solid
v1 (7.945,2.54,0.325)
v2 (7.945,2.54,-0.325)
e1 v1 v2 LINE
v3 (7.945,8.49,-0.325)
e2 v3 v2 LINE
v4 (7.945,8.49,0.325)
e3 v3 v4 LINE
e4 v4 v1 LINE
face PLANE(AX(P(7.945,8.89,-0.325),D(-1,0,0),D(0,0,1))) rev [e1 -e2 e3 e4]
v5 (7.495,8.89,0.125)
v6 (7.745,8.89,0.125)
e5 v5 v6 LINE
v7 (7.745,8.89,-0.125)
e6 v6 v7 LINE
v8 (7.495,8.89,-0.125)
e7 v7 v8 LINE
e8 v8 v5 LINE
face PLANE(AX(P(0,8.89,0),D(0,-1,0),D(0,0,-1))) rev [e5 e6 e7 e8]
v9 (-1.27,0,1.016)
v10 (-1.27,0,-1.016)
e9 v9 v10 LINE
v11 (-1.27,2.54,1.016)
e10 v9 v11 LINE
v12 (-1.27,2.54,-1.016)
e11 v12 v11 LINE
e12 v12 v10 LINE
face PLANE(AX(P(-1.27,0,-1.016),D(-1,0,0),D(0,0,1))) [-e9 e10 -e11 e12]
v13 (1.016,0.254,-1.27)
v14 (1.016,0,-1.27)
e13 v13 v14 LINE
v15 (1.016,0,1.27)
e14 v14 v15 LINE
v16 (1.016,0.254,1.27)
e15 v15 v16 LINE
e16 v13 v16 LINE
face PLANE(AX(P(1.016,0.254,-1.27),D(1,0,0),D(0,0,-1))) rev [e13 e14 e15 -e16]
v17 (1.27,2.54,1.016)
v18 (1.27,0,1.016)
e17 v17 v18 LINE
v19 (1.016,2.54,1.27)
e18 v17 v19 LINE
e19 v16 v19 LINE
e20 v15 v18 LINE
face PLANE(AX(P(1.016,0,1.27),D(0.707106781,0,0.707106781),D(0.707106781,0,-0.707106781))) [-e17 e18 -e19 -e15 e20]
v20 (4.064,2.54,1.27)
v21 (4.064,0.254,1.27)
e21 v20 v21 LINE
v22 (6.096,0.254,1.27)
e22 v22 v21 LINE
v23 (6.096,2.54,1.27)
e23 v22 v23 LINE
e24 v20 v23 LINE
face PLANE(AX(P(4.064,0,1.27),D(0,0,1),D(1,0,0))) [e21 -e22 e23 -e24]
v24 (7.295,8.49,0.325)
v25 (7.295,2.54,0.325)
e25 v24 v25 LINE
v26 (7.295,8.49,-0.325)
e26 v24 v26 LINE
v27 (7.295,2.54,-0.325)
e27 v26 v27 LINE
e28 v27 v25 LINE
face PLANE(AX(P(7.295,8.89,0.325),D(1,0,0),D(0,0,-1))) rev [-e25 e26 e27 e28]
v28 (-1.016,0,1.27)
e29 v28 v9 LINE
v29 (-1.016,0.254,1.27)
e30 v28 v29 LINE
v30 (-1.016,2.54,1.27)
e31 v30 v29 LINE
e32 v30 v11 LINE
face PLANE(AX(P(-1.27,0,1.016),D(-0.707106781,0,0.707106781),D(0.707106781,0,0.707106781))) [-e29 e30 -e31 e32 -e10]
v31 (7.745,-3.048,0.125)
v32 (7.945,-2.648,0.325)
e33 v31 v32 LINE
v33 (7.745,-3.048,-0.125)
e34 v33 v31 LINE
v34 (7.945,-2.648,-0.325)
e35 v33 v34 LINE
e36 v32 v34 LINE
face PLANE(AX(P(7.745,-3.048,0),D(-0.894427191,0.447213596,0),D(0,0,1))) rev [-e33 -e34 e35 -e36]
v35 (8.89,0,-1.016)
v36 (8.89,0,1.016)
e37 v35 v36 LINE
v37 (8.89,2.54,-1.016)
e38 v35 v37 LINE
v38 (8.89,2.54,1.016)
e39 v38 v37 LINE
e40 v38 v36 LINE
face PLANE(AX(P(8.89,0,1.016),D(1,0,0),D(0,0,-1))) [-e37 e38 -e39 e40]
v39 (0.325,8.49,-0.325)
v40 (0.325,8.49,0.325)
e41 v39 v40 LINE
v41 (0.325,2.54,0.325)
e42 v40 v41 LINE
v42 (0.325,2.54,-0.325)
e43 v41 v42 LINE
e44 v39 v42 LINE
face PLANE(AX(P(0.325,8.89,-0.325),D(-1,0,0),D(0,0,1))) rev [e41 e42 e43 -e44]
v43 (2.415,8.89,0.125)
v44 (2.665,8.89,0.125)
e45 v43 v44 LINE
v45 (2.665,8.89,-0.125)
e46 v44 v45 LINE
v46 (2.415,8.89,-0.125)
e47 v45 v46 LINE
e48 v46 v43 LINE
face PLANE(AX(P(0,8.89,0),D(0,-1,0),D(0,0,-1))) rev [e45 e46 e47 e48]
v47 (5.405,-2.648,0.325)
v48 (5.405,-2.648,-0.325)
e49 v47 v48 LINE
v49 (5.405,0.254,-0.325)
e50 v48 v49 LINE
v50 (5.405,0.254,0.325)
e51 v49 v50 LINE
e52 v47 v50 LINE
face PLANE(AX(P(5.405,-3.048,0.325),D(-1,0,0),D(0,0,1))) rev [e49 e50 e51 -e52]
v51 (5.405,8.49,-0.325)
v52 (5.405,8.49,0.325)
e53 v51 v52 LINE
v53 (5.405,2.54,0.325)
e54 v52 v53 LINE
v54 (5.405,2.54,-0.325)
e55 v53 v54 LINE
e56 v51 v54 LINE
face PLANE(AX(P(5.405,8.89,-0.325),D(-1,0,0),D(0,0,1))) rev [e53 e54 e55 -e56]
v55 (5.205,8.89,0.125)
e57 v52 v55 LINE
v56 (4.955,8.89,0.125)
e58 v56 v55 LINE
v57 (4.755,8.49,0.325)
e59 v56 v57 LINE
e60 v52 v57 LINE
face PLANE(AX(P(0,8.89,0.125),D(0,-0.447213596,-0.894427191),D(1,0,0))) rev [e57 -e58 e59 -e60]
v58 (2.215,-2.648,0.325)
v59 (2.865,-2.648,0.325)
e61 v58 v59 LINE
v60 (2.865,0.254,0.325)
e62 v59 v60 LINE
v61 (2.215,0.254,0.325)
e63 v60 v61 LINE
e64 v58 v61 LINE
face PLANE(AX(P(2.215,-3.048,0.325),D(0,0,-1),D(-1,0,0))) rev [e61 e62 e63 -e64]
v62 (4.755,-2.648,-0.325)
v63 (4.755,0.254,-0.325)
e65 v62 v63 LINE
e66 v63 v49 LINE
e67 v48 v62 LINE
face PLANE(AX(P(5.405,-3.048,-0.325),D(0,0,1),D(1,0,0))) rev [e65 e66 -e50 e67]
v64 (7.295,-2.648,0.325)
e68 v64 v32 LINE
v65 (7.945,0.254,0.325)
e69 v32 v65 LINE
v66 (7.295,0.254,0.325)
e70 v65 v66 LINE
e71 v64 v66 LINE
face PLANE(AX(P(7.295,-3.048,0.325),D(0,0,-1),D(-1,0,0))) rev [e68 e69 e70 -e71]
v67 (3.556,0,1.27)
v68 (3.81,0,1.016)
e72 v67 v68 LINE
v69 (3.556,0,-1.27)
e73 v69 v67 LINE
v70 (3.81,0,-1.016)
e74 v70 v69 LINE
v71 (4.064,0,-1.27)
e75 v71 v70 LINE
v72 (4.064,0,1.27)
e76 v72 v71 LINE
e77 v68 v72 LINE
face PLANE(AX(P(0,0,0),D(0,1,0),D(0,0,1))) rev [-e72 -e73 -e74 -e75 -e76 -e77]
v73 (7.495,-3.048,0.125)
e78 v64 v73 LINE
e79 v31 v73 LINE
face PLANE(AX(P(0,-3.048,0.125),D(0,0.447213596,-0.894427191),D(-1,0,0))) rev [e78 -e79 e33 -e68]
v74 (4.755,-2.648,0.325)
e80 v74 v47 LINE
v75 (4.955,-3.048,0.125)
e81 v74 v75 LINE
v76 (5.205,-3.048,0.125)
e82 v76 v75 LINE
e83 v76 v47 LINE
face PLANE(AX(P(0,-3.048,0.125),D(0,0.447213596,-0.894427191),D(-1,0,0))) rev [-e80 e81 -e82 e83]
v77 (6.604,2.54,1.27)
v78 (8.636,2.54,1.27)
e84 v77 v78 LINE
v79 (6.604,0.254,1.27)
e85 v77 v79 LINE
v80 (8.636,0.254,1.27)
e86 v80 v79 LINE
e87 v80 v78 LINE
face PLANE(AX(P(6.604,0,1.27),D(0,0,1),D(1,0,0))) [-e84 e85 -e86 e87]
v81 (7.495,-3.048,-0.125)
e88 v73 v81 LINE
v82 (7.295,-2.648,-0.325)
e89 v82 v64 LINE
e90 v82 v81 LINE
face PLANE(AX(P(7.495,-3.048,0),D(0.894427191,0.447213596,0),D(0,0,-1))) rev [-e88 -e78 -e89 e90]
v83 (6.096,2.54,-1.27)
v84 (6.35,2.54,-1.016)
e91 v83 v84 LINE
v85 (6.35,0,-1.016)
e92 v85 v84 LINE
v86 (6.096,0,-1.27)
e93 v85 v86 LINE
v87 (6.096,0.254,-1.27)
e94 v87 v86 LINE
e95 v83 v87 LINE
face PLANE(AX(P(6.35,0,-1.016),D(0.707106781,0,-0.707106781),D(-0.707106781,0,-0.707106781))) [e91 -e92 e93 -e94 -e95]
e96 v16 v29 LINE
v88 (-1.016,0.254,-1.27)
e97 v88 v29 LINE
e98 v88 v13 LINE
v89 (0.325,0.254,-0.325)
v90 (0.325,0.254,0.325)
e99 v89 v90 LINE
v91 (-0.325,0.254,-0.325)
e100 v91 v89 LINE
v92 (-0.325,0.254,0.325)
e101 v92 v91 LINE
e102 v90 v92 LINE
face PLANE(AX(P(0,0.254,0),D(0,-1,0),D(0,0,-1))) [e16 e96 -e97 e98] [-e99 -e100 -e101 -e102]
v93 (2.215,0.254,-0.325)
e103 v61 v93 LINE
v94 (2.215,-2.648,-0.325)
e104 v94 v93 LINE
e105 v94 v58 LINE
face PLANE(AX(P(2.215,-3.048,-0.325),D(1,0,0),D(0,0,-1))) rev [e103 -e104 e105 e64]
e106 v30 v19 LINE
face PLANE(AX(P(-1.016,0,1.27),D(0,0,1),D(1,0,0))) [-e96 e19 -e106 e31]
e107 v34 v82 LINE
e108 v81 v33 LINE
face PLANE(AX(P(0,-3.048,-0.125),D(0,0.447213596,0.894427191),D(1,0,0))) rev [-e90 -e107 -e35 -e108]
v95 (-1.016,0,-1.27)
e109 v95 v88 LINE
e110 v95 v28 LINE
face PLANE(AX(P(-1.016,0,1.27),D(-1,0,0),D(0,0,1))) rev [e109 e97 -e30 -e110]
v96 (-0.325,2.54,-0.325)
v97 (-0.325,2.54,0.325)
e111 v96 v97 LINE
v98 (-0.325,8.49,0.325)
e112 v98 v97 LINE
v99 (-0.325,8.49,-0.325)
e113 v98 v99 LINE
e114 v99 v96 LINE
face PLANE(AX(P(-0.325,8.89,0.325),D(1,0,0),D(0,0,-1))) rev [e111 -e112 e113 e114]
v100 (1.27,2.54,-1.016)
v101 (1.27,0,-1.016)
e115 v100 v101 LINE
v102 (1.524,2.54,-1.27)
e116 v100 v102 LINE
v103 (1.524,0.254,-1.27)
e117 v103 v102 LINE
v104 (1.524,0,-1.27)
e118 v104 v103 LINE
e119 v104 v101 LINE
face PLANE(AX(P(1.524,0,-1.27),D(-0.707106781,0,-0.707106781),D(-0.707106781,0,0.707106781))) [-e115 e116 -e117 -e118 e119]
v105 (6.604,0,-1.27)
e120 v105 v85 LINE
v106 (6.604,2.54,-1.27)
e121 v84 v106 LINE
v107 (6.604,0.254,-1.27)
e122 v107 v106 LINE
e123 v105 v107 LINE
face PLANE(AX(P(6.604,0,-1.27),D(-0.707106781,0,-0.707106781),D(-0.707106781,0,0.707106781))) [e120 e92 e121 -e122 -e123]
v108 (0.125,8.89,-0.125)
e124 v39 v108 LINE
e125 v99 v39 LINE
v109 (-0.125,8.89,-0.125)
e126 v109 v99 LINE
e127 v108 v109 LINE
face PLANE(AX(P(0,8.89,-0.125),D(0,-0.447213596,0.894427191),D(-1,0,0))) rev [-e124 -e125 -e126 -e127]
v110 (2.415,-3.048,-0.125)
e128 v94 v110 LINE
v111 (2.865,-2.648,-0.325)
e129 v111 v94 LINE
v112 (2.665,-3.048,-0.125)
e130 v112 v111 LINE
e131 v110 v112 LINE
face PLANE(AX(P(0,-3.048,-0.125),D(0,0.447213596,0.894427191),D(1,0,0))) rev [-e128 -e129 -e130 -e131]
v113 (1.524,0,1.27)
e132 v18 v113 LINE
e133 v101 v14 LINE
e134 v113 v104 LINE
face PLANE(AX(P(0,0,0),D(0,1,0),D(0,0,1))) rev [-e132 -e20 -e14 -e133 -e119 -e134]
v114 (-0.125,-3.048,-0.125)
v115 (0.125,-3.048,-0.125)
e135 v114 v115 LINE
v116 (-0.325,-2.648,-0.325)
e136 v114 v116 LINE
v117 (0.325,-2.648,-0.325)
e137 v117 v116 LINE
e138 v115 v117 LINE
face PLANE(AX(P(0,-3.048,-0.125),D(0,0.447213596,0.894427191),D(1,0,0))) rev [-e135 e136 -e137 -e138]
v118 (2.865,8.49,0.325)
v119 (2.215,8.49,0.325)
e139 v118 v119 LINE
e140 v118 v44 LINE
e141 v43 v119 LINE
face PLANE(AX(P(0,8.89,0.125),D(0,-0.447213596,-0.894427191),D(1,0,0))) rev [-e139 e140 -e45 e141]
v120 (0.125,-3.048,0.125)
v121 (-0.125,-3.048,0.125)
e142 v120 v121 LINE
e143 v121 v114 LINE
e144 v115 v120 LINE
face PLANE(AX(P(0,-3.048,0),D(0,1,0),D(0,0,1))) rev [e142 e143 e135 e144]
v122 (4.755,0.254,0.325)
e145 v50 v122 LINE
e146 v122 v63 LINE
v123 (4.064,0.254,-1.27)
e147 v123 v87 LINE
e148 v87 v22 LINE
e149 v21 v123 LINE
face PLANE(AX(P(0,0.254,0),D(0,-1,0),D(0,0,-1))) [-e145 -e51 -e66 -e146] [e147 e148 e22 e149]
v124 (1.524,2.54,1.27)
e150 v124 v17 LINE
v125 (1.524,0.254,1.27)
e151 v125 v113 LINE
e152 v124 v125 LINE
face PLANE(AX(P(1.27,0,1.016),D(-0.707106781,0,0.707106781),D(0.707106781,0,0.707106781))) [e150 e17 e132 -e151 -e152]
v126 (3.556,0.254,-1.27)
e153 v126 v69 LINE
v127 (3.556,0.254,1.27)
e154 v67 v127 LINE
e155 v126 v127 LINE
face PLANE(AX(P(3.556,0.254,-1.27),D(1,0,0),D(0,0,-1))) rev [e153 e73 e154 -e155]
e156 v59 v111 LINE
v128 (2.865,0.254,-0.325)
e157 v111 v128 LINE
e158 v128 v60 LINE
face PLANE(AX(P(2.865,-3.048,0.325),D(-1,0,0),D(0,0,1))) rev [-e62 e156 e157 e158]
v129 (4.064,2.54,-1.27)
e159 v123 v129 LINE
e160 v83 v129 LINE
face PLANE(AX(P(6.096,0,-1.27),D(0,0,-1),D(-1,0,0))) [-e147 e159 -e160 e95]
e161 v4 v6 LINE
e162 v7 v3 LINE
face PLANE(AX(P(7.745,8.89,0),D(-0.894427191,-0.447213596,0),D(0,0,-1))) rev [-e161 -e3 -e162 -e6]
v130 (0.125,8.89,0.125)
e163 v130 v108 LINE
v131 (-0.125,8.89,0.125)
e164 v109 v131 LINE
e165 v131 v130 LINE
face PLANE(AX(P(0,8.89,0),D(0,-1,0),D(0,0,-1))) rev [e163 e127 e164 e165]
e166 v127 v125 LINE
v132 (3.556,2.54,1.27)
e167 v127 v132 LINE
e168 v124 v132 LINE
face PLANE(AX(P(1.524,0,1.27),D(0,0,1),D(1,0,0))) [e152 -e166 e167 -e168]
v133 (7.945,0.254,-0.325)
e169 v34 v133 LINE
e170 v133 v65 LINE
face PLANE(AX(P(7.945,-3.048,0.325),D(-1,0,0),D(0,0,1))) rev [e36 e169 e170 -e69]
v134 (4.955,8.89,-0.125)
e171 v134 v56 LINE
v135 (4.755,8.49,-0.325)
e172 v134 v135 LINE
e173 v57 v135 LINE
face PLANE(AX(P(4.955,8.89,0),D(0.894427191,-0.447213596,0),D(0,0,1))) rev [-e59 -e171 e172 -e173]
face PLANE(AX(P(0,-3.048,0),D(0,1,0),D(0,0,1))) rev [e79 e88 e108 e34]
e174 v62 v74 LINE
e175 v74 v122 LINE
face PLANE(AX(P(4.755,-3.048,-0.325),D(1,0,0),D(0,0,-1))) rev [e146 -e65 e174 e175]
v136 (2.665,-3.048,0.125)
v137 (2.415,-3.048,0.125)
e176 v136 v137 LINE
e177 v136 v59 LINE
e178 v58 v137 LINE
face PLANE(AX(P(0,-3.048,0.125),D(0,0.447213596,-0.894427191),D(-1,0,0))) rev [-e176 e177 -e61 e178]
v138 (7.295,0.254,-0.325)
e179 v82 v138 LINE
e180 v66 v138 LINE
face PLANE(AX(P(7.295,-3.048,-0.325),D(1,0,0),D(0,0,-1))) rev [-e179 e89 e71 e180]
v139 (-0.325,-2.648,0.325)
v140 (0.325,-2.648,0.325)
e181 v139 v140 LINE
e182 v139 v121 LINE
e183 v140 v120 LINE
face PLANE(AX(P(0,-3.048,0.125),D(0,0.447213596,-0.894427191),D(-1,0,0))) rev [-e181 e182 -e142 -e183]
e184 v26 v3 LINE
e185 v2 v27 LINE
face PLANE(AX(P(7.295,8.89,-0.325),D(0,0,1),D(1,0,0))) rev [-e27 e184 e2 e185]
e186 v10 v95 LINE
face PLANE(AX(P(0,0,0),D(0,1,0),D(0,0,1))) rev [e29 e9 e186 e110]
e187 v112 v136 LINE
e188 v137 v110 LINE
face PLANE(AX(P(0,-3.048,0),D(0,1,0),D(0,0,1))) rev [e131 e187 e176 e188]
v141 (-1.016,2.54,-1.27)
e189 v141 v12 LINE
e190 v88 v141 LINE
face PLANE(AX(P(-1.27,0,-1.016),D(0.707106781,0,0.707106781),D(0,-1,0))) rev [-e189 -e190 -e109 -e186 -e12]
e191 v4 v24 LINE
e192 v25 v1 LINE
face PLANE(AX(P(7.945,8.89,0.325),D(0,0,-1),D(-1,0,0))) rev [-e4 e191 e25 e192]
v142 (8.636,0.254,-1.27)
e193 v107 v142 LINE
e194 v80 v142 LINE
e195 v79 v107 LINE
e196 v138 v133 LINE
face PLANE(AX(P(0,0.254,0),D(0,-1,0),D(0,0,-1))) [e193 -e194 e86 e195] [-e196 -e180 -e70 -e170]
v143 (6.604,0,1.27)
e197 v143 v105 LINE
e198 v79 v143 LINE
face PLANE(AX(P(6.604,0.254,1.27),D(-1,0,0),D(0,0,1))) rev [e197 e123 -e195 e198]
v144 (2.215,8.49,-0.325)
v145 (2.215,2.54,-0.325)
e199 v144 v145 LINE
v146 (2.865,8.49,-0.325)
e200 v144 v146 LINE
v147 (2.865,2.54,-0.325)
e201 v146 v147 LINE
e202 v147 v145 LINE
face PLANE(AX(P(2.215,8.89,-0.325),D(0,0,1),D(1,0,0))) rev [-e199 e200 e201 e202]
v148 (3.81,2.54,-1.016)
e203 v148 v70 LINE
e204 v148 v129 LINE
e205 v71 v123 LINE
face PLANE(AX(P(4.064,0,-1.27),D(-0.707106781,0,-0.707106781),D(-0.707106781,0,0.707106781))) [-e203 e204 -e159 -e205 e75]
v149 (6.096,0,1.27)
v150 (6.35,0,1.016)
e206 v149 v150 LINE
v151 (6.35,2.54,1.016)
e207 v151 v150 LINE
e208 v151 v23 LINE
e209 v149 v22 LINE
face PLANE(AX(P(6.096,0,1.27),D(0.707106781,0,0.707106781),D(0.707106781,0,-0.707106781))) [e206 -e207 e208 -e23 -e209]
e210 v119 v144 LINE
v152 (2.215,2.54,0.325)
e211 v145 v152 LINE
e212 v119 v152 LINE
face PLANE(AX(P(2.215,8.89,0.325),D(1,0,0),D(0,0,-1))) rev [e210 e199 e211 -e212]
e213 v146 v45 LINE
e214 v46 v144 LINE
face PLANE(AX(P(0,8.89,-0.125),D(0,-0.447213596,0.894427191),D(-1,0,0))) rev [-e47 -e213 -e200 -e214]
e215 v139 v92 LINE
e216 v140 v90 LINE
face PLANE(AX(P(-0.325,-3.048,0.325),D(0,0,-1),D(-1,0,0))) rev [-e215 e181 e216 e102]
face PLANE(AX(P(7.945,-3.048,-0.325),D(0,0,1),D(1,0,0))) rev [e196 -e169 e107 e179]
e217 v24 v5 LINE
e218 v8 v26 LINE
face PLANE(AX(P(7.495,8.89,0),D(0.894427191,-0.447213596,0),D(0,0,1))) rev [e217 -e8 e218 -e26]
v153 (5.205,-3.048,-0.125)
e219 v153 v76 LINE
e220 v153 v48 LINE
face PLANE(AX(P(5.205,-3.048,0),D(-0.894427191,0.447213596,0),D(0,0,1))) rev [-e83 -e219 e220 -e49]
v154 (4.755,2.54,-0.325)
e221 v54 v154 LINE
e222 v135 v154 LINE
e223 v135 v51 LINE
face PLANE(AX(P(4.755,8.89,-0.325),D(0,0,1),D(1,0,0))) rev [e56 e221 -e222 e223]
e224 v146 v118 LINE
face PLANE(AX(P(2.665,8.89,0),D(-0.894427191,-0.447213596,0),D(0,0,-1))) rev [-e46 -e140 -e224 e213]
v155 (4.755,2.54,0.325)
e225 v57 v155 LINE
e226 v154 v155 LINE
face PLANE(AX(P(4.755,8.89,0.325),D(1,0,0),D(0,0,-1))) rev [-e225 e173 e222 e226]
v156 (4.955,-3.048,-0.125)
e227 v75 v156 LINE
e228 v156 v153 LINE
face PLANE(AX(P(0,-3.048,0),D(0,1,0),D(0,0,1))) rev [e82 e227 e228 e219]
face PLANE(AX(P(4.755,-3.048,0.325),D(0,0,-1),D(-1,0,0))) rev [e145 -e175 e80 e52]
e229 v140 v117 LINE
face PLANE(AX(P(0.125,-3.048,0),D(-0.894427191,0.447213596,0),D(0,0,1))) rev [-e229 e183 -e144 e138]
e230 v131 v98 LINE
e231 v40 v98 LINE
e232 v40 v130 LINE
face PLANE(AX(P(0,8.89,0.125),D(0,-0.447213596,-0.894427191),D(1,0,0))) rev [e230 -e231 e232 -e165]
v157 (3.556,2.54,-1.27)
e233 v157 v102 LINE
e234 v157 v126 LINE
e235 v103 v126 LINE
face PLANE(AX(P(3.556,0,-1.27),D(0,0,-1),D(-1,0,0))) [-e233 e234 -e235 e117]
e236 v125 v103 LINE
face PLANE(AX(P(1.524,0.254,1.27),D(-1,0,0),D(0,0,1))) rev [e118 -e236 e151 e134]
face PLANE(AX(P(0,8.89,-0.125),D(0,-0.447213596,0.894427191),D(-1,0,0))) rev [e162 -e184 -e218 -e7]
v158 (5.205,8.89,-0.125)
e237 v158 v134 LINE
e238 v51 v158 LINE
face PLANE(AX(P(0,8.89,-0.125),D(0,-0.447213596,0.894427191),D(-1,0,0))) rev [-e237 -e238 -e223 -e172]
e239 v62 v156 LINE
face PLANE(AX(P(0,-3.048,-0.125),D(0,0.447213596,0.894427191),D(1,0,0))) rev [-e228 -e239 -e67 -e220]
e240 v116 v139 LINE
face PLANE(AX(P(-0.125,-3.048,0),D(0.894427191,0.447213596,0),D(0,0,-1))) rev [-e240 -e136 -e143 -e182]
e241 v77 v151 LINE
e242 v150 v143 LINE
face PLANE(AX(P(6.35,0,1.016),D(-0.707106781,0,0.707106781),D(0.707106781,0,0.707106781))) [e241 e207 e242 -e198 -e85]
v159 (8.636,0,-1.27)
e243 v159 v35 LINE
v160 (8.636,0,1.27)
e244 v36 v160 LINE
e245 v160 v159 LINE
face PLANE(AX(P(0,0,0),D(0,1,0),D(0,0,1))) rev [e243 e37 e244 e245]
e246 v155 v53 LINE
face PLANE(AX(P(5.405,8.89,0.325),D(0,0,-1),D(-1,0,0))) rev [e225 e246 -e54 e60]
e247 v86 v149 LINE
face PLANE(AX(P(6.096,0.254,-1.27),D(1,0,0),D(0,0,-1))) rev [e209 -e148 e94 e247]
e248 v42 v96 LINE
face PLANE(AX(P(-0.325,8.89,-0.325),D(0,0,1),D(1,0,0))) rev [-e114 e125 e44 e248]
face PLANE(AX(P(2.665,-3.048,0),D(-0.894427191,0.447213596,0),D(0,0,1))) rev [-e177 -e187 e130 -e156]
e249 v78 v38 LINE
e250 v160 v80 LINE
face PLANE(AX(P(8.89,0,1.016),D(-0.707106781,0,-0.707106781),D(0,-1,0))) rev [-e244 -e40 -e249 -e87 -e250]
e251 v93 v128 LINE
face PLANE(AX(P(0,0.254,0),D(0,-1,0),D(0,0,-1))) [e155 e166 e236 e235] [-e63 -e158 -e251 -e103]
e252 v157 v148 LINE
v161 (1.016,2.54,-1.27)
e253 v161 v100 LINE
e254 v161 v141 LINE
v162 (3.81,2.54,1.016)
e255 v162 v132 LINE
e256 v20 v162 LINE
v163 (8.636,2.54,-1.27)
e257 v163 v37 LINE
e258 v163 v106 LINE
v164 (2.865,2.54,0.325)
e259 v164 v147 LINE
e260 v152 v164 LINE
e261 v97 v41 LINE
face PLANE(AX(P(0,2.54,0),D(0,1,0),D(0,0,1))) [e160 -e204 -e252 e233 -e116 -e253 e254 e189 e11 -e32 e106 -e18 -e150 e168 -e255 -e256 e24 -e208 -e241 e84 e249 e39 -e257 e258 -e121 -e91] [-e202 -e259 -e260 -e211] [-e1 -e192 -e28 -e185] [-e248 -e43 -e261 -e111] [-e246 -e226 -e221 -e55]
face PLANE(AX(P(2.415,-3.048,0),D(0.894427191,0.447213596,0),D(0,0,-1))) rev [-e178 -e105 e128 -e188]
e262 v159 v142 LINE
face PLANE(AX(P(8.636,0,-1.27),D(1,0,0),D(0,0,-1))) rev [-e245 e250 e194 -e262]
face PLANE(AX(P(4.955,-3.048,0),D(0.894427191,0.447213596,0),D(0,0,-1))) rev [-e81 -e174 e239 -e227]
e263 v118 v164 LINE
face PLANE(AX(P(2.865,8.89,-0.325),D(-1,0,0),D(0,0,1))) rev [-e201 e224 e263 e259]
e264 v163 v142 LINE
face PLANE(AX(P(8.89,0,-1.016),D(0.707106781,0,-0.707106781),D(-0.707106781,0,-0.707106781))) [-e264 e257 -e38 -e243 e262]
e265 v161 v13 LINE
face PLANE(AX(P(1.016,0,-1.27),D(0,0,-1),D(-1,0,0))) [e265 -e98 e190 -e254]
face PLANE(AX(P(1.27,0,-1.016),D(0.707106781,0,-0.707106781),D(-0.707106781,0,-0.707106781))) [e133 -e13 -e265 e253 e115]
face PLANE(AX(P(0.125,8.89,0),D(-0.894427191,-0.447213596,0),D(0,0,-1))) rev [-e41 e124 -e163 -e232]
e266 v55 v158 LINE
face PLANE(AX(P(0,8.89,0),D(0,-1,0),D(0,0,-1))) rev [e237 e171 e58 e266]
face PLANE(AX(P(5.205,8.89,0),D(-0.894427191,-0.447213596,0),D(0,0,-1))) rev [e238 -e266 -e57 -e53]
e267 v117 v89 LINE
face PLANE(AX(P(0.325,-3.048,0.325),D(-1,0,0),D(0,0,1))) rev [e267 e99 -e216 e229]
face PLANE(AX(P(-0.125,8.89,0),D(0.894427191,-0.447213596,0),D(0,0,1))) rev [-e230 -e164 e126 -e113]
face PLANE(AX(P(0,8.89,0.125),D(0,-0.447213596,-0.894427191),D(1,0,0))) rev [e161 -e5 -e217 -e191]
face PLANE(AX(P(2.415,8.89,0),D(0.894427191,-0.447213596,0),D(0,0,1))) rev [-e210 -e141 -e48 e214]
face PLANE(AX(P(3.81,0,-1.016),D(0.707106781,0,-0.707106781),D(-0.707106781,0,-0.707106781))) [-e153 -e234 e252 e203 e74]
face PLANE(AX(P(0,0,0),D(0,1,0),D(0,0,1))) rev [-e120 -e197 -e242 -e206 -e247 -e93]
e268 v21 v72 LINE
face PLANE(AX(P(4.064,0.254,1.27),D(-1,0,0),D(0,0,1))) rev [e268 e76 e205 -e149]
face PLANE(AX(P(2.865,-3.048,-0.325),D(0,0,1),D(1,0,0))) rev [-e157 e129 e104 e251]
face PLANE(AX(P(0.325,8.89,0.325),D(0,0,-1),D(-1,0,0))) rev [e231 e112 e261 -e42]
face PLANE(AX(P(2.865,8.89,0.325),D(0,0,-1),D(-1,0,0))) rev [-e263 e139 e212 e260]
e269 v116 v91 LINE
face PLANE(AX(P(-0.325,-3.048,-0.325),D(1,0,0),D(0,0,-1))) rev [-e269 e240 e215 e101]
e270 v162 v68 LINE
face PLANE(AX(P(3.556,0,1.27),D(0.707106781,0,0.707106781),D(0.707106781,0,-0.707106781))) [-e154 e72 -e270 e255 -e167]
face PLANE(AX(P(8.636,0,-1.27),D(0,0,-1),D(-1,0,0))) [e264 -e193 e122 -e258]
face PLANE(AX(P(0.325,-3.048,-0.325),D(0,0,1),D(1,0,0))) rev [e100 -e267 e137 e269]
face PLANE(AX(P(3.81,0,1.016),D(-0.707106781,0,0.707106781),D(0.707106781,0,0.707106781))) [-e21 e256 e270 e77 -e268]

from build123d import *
from OCP.BRepFilletAPI import BRepFilletAPI_MakeChamfer

# Parameters (mm, degrees)
CUT_EXTRUDE1_START   = -2.54
CUT_EXTRUDE1_DEPTH   = 2.286
CUT_EXTRUDE1_START_2 = -0.254
CUT_EXTRUDE1_2_DEPTH = 0.254
SKETCH2_W            = 2.032
SKETCH2_H            = 2.54
CUT_EXTRUDE2_DEPTH   = 0.254
CUT_EXTRUDE3_DEPTH   = 0.254
CUT_EXTRUDE4_DEPTH   = 0.254
BOSS_EXTRUDE1_DEPTH  = 0.254
BOSS_EXTRUDE2_DEPTH  = 0.254
SKETCH7_W            = 0.65
SKETCH7_H            = 0.65
BOSS_EXTRUDE3_DEPTH  = 3.302
SKETCH8_W            = 0.65
SKETCH8_H            = 0.65
BOSS_EXTRUDE4_DEPTH  = 3.302
SKETCH9_W            = 0.65
SKETCH9_H            = 0.65
BOSS_EXTRUDE5_DEPTH  = 3.302
SKETCH10_W           = 0.65
SKETCH10_H           = 0.65
BOSS_EXTRUDE6_DEPTH  = 3.302
SKETCH11_W           = 0.65
SKETCH11_H           = 0.65
BOSS_EXTRUDE7_DEPTH  = 6.35
SKETCH12_W           = 0.65
SKETCH12_H           = 0.65
BOSS_EXTRUDE8_DEPTH  = 6.35
SKETCH13_W           = 0.65
SKETCH13_H           = 0.65
BOSS_EXTRUDE9_DEPTH  = 6.35
SKETCH14_W           = 0.65
SKETCH14_H           = 0.65
BOSS_EXTRUDE10_DEPTH = 6.35
CHAMFER1_SIZE        = 0.254
CHAMFER2_SIZE        = 0.2
CHAMFER2_SIZE2       = 0.4


with BuildPart() as part:
    # Cut-Extrude1: read off the stored shape, not the designer's step
    # Cut-Extrude1 outline → Cut-Extrude1 (new body)
    with BuildSketch(Plane.XZ.offset(CUT_EXTRUDE1_START)):
        Polygon((3.556, 1.27), (1.524, 1.27), (1.27, 1.016), (1.016, 1.27), (-1.016, 1.27), (-1.27, 1.016), (-1.27, -1.27), (1.016, -1.27), (1.27, -1.016), (1.524, -1.27), (3.556, -1.27), (3.81, -1.016), (4.064, -1.27), (6.096, -1.27), (6.35, -1.016), (6.604, -1.27), (8.636, -1.27), (8.89, -1.016), (8.89, 1.27), (6.604, 1.27), (6.35, 1.016), (6.096, 1.27), (4.064, 1.27), (3.81, 1.016), align=None)
    extrude(amount=CUT_EXTRUDE1_DEPTH)

    # Cut-Extrude1 2 outline → Cut-Extrude1 2 (add)
    with BuildSketch(Plane.XZ.offset(CUT_EXTRUDE1_START_2)):
        Polygon((1.27, -1.016), (1.524, -1.27), (1.524, 1.27), (1.27, 1.016), (1.016, 1.27), (-1.016, 1.27), (-1.27, 1.016), (-1.27, -1.27), (1.016, -1.27), align=None)
        Polygon((3.556, 1.27), (3.556, -1.27), (3.81, -1.016), (4.064, -1.27), (6.096, -1.27), (6.35, -1.016), (6.604, -1.27), (8.636, -1.27), (8.89, -1.016), (8.89, 1.27), (6.604, 1.27), (6.35, 1.016), (6.096, 1.27), (4.064, 1.27), (3.81, 1.016), align=None)
    extrude(amount=CUT_EXTRUDE1_2_DEPTH)

    # Sketch2 → Cut-Extrude2 (cut)
    with BuildSketch(Plane.XZ):
        with Locations((5.08, 0)):
            Rectangle(SKETCH2_W, SKETCH2_H)
    extrude(amount=-CUT_EXTRUDE2_DEPTH, mode=Mode.SUBTRACT)

    # Sketch3 → Cut-Extrude3 (cut)
    with BuildSketch(Plane.XZ):
        Polygon((-1.27, -1.27), (1.016, -1.27), (1.016, 1.27), (-1.016, 1.27), (-1.27, 1.016), align=None)
    extrude(amount=-CUT_EXTRUDE3_DEPTH, mode=Mode.SUBTRACT)

    # Sketch4 → Cut-Extrude4 (cut)
    with BuildSketch(Plane.XZ):
        Polygon((6.604, -1.27), (8.636, -1.27), (8.89, -1.016), (8.89, 1.27), (6.604, 1.27), align=None)
    extrude(amount=-CUT_EXTRUDE4_DEPTH, mode=Mode.SUBTRACT)

    # Sketch5 → Boss-Extrude1 (add)
    with BuildSketch(Plane.XZ.offset(-0.254)):
        Polygon((-1.27, -1.27), (-1.27, 1.016), (-1.016, 1.27), (-1.016, -1.27), align=None)
    extrude(amount=BOSS_EXTRUDE1_DEPTH)

    # Sketch6 → Boss-Extrude2 (add)
    with BuildSketch(Plane.XZ.offset(-0.254)):
        Polygon((8.89, 1.27), (8.89, -1.016), (8.636, -1.27), (8.636, 1.27), align=None)
    extrude(amount=BOSS_EXTRUDE2_DEPTH)

    # Sketch7 → Boss-Extrude3 (add)
    with BuildSketch(Plane.XZ.offset(-0.254)):
        Rectangle(SKETCH7_W, SKETCH7_H)
    extrude(amount=BOSS_EXTRUDE3_DEPTH)

    # Sketch8 → Boss-Extrude4 (add)
    with BuildSketch(Plane.XZ.offset(-0.254)):
        with Locations((2.54, 0)):
            Rectangle(SKETCH8_W, SKETCH8_H)
    extrude(amount=BOSS_EXTRUDE4_DEPTH)

    # Sketch9 → Boss-Extrude5 (add)
    with BuildSketch(Plane.XZ.offset(-0.254)):
        with Locations((5.08, 0)):
            Rectangle(SKETCH9_W, SKETCH9_H)
    extrude(amount=BOSS_EXTRUDE5_DEPTH)

    # Sketch10 → Boss-Extrude6 (add)
    with BuildSketch(Plane.XZ.offset(-0.254)):
        with Locations((7.62, 0)):
            Rectangle(SKETCH10_W, SKETCH10_H)
    extrude(amount=BOSS_EXTRUDE6_DEPTH)

    # Sketch11 → Boss-Extrude7 (add)
    with BuildSketch(Plane(origin=(0, 2.54, 0), x_dir=(-1, 0, 0), z_dir=(0, 1, 0))):
        Rectangle(SKETCH11_W, SKETCH11_H)
    extrude(amount=BOSS_EXTRUDE7_DEPTH)

    # Sketch12 → Boss-Extrude8 (add)
    with BuildSketch(Plane(origin=(0, 2.54, 0), x_dir=(-1, 0, 0), z_dir=(0, 1, 0))):
        with Locations((-2.54, 0)):
            Rectangle(SKETCH12_W, SKETCH12_H)
    extrude(amount=BOSS_EXTRUDE8_DEPTH)

    # Sketch13 → Boss-Extrude9 (add)
    with BuildSketch(Plane(origin=(0, 2.54, 0), x_dir=(-1, 0, 0), z_dir=(0, 1, 0))):
        with Locations((-5.08, 0)):
            Rectangle(SKETCH13_W, SKETCH13_H)
    extrude(amount=BOSS_EXTRUDE9_DEPTH)

    # Sketch14 → Boss-Extrude10 (add)
    with BuildSketch(Plane(origin=(0, 2.54, 0), x_dir=(-1, 0, 0), z_dir=(0, 1, 0))):
        with Locations((-7.62, 0)):
            Rectangle(SKETCH14_W, SKETCH14_H)
    extrude(amount=BOSS_EXTRUDE10_DEPTH)

    # Chamfer1
    chamfer1_edges = [part.edges().sort_by_distance(p)[0] for p in [
        (-1.27, 1.27, -1.27),
        (8.89, 1.27, 1.27),
    ]]
    chamfer(chamfer1_edges, length=CHAMFER1_SIZE)

    # Chamfer2: one chamfer whose edges measure the first distance from different faces: ONE call of the kernel's chamfer builder (chamfer() names one face for all edges)
    chamfer2_edges_1 = [part.edges().sort_by_distance(p)[0] for p in [
        (-0.325, -3.048, 0),
        (0, -3.048, -0.325),
        (0.325, -3.048, 0),
        (0, -3.048, 0.325),
    ]]
    chamfer2_side_1 = [part.faces().sort_by_distance(p)[0] for p in [
        (0, -3.048, 0),
    ]]
    chamfer2_edges_2 = [part.edges().sort_by_distance(p)[0] for p in [
        (2.54, -3.048, -0.325),
        (2.865, -3.048, 0),
        (2.54, -3.048, 0.325),
        (2.215, -3.048, 0),
    ]]
    chamfer2_side_2 = [part.faces().sort_by_distance(p)[0] for p in [
        (2.54, -3.048, 0),
    ]]
    chamfer2_edges_3 = [part.edges().sort_by_distance(p)[0] for p in [
        (5.08, -3.048, -0.325),
        (5.405, -3.048, 0),
        (5.08, -3.048, 0.325),
        (4.755, -3.048, 0),
    ]]
    chamfer2_side_3 = [part.faces().sort_by_distance(p)[0] for p in [
        (5.08, -3.048, 0),
    ]]
    chamfer2_edges_4 = [part.edges().sort_by_distance(p)[0] for p in [
        (7.62, -3.048, -0.325),
        (7.945, -3.048, 0),
        (7.62, -3.048, 0.325),
        (7.295, -3.048, 0),
    ]]
    chamfer2_side_4 = [part.faces().sort_by_distance(p)[0] for p in [
        (7.62, -3.048, 0),
    ]]
    chamfer2_edges_5 = [part.edges().sort_by_distance(p)[0] for p in [
        (0, 8.89, -0.325),
        (-0.325, 8.89, 0),
        (0, 8.89, 0.325),
        (0.325, 8.89, 0),
    ]]
    chamfer2_side_5 = [part.faces().sort_by_distance(p)[0] for p in [
        (0, 8.89, 0),
    ]]
    chamfer2_edges_6 = [part.edges().sort_by_distance(p)[0] for p in [
        (2.54, 8.89, -0.325),
        (2.215, 8.89, 0),
        (2.54, 8.89, 0.325),
        (2.865, 8.89, 0),
    ]]
    chamfer2_side_6 = [part.faces().sort_by_distance(p)[0] for p in [
        (2.54, 8.89, 0),
    ]]
    chamfer2_edges_7 = [part.edges().sort_by_distance(p)[0] for p in [
        (5.08, 8.89, -0.325),
        (4.755, 8.89, 0),
        (5.08, 8.89, 0.325),
        (5.405, 8.89, 0),
    ]]
    chamfer2_side_7 = [part.faces().sort_by_distance(p)[0] for p in [
        (5.08, 8.89, 0),
    ]]
    chamfer2_edges_8 = [part.edges().sort_by_distance(p)[0] for p in [
        (7.945, 8.89, 0),
        (7.62, 8.89, -0.325),
        (7.295, 8.89, 0),
        (7.62, 8.89, 0.325),
    ]]
    chamfer2_side_8 = [part.faces().sort_by_distance(p)[0] for p in [
        (7.62, 8.89, 0),
    ]]
    chamfer2 = BRepFilletAPI_MakeChamfer(part.part.solid().wrapped)
    for e in chamfer2_edges_1:
        chamfer2.Add(CHAMFER2_SIZE, CHAMFER2_SIZE2, e.wrapped, chamfer2_side_1[0].wrapped)  # the first distance lies on this face
    for e in chamfer2_edges_2:
        chamfer2.Add(CHAMFER2_SIZE, CHAMFER2_SIZE2, e.wrapped, chamfer2_side_2[0].wrapped)  # the first distance lies on this face
    for e in chamfer2_edges_3:
        chamfer2.Add(CHAMFER2_SIZE, CHAMFER2_SIZE2, e.wrapped, chamfer2_side_3[0].wrapped)  # the first distance lies on this face
    for e in chamfer2_edges_4:
        chamfer2.Add(CHAMFER2_SIZE, CHAMFER2_SIZE2, e.wrapped, chamfer2_side_4[0].wrapped)  # the first distance lies on this face
    for e in chamfer2_edges_5:
        chamfer2.Add(CHAMFER2_SIZE, CHAMFER2_SIZE2, e.wrapped, chamfer2_side_5[0].wrapped)  # the first distance lies on this face
    for e in chamfer2_edges_6:
        chamfer2.Add(CHAMFER2_SIZE, CHAMFER2_SIZE2, e.wrapped, chamfer2_side_6[0].wrapped)  # the first distance lies on this face
    for e in chamfer2_edges_7:
        chamfer2.Add(CHAMFER2_SIZE, CHAMFER2_SIZE2, e.wrapped, chamfer2_side_7[0].wrapped)  # the first distance lies on this face
    for e in chamfer2_edges_8:
        chamfer2.Add(CHAMFER2_SIZE, CHAMFER2_SIZE2, e.wrapped, chamfer2_side_8[0].wrapped)  # the first distance lies on this face
    add(Compound.cast(chamfer2.Shape()), mode=Mode.REPLACE)


solid = part.part
